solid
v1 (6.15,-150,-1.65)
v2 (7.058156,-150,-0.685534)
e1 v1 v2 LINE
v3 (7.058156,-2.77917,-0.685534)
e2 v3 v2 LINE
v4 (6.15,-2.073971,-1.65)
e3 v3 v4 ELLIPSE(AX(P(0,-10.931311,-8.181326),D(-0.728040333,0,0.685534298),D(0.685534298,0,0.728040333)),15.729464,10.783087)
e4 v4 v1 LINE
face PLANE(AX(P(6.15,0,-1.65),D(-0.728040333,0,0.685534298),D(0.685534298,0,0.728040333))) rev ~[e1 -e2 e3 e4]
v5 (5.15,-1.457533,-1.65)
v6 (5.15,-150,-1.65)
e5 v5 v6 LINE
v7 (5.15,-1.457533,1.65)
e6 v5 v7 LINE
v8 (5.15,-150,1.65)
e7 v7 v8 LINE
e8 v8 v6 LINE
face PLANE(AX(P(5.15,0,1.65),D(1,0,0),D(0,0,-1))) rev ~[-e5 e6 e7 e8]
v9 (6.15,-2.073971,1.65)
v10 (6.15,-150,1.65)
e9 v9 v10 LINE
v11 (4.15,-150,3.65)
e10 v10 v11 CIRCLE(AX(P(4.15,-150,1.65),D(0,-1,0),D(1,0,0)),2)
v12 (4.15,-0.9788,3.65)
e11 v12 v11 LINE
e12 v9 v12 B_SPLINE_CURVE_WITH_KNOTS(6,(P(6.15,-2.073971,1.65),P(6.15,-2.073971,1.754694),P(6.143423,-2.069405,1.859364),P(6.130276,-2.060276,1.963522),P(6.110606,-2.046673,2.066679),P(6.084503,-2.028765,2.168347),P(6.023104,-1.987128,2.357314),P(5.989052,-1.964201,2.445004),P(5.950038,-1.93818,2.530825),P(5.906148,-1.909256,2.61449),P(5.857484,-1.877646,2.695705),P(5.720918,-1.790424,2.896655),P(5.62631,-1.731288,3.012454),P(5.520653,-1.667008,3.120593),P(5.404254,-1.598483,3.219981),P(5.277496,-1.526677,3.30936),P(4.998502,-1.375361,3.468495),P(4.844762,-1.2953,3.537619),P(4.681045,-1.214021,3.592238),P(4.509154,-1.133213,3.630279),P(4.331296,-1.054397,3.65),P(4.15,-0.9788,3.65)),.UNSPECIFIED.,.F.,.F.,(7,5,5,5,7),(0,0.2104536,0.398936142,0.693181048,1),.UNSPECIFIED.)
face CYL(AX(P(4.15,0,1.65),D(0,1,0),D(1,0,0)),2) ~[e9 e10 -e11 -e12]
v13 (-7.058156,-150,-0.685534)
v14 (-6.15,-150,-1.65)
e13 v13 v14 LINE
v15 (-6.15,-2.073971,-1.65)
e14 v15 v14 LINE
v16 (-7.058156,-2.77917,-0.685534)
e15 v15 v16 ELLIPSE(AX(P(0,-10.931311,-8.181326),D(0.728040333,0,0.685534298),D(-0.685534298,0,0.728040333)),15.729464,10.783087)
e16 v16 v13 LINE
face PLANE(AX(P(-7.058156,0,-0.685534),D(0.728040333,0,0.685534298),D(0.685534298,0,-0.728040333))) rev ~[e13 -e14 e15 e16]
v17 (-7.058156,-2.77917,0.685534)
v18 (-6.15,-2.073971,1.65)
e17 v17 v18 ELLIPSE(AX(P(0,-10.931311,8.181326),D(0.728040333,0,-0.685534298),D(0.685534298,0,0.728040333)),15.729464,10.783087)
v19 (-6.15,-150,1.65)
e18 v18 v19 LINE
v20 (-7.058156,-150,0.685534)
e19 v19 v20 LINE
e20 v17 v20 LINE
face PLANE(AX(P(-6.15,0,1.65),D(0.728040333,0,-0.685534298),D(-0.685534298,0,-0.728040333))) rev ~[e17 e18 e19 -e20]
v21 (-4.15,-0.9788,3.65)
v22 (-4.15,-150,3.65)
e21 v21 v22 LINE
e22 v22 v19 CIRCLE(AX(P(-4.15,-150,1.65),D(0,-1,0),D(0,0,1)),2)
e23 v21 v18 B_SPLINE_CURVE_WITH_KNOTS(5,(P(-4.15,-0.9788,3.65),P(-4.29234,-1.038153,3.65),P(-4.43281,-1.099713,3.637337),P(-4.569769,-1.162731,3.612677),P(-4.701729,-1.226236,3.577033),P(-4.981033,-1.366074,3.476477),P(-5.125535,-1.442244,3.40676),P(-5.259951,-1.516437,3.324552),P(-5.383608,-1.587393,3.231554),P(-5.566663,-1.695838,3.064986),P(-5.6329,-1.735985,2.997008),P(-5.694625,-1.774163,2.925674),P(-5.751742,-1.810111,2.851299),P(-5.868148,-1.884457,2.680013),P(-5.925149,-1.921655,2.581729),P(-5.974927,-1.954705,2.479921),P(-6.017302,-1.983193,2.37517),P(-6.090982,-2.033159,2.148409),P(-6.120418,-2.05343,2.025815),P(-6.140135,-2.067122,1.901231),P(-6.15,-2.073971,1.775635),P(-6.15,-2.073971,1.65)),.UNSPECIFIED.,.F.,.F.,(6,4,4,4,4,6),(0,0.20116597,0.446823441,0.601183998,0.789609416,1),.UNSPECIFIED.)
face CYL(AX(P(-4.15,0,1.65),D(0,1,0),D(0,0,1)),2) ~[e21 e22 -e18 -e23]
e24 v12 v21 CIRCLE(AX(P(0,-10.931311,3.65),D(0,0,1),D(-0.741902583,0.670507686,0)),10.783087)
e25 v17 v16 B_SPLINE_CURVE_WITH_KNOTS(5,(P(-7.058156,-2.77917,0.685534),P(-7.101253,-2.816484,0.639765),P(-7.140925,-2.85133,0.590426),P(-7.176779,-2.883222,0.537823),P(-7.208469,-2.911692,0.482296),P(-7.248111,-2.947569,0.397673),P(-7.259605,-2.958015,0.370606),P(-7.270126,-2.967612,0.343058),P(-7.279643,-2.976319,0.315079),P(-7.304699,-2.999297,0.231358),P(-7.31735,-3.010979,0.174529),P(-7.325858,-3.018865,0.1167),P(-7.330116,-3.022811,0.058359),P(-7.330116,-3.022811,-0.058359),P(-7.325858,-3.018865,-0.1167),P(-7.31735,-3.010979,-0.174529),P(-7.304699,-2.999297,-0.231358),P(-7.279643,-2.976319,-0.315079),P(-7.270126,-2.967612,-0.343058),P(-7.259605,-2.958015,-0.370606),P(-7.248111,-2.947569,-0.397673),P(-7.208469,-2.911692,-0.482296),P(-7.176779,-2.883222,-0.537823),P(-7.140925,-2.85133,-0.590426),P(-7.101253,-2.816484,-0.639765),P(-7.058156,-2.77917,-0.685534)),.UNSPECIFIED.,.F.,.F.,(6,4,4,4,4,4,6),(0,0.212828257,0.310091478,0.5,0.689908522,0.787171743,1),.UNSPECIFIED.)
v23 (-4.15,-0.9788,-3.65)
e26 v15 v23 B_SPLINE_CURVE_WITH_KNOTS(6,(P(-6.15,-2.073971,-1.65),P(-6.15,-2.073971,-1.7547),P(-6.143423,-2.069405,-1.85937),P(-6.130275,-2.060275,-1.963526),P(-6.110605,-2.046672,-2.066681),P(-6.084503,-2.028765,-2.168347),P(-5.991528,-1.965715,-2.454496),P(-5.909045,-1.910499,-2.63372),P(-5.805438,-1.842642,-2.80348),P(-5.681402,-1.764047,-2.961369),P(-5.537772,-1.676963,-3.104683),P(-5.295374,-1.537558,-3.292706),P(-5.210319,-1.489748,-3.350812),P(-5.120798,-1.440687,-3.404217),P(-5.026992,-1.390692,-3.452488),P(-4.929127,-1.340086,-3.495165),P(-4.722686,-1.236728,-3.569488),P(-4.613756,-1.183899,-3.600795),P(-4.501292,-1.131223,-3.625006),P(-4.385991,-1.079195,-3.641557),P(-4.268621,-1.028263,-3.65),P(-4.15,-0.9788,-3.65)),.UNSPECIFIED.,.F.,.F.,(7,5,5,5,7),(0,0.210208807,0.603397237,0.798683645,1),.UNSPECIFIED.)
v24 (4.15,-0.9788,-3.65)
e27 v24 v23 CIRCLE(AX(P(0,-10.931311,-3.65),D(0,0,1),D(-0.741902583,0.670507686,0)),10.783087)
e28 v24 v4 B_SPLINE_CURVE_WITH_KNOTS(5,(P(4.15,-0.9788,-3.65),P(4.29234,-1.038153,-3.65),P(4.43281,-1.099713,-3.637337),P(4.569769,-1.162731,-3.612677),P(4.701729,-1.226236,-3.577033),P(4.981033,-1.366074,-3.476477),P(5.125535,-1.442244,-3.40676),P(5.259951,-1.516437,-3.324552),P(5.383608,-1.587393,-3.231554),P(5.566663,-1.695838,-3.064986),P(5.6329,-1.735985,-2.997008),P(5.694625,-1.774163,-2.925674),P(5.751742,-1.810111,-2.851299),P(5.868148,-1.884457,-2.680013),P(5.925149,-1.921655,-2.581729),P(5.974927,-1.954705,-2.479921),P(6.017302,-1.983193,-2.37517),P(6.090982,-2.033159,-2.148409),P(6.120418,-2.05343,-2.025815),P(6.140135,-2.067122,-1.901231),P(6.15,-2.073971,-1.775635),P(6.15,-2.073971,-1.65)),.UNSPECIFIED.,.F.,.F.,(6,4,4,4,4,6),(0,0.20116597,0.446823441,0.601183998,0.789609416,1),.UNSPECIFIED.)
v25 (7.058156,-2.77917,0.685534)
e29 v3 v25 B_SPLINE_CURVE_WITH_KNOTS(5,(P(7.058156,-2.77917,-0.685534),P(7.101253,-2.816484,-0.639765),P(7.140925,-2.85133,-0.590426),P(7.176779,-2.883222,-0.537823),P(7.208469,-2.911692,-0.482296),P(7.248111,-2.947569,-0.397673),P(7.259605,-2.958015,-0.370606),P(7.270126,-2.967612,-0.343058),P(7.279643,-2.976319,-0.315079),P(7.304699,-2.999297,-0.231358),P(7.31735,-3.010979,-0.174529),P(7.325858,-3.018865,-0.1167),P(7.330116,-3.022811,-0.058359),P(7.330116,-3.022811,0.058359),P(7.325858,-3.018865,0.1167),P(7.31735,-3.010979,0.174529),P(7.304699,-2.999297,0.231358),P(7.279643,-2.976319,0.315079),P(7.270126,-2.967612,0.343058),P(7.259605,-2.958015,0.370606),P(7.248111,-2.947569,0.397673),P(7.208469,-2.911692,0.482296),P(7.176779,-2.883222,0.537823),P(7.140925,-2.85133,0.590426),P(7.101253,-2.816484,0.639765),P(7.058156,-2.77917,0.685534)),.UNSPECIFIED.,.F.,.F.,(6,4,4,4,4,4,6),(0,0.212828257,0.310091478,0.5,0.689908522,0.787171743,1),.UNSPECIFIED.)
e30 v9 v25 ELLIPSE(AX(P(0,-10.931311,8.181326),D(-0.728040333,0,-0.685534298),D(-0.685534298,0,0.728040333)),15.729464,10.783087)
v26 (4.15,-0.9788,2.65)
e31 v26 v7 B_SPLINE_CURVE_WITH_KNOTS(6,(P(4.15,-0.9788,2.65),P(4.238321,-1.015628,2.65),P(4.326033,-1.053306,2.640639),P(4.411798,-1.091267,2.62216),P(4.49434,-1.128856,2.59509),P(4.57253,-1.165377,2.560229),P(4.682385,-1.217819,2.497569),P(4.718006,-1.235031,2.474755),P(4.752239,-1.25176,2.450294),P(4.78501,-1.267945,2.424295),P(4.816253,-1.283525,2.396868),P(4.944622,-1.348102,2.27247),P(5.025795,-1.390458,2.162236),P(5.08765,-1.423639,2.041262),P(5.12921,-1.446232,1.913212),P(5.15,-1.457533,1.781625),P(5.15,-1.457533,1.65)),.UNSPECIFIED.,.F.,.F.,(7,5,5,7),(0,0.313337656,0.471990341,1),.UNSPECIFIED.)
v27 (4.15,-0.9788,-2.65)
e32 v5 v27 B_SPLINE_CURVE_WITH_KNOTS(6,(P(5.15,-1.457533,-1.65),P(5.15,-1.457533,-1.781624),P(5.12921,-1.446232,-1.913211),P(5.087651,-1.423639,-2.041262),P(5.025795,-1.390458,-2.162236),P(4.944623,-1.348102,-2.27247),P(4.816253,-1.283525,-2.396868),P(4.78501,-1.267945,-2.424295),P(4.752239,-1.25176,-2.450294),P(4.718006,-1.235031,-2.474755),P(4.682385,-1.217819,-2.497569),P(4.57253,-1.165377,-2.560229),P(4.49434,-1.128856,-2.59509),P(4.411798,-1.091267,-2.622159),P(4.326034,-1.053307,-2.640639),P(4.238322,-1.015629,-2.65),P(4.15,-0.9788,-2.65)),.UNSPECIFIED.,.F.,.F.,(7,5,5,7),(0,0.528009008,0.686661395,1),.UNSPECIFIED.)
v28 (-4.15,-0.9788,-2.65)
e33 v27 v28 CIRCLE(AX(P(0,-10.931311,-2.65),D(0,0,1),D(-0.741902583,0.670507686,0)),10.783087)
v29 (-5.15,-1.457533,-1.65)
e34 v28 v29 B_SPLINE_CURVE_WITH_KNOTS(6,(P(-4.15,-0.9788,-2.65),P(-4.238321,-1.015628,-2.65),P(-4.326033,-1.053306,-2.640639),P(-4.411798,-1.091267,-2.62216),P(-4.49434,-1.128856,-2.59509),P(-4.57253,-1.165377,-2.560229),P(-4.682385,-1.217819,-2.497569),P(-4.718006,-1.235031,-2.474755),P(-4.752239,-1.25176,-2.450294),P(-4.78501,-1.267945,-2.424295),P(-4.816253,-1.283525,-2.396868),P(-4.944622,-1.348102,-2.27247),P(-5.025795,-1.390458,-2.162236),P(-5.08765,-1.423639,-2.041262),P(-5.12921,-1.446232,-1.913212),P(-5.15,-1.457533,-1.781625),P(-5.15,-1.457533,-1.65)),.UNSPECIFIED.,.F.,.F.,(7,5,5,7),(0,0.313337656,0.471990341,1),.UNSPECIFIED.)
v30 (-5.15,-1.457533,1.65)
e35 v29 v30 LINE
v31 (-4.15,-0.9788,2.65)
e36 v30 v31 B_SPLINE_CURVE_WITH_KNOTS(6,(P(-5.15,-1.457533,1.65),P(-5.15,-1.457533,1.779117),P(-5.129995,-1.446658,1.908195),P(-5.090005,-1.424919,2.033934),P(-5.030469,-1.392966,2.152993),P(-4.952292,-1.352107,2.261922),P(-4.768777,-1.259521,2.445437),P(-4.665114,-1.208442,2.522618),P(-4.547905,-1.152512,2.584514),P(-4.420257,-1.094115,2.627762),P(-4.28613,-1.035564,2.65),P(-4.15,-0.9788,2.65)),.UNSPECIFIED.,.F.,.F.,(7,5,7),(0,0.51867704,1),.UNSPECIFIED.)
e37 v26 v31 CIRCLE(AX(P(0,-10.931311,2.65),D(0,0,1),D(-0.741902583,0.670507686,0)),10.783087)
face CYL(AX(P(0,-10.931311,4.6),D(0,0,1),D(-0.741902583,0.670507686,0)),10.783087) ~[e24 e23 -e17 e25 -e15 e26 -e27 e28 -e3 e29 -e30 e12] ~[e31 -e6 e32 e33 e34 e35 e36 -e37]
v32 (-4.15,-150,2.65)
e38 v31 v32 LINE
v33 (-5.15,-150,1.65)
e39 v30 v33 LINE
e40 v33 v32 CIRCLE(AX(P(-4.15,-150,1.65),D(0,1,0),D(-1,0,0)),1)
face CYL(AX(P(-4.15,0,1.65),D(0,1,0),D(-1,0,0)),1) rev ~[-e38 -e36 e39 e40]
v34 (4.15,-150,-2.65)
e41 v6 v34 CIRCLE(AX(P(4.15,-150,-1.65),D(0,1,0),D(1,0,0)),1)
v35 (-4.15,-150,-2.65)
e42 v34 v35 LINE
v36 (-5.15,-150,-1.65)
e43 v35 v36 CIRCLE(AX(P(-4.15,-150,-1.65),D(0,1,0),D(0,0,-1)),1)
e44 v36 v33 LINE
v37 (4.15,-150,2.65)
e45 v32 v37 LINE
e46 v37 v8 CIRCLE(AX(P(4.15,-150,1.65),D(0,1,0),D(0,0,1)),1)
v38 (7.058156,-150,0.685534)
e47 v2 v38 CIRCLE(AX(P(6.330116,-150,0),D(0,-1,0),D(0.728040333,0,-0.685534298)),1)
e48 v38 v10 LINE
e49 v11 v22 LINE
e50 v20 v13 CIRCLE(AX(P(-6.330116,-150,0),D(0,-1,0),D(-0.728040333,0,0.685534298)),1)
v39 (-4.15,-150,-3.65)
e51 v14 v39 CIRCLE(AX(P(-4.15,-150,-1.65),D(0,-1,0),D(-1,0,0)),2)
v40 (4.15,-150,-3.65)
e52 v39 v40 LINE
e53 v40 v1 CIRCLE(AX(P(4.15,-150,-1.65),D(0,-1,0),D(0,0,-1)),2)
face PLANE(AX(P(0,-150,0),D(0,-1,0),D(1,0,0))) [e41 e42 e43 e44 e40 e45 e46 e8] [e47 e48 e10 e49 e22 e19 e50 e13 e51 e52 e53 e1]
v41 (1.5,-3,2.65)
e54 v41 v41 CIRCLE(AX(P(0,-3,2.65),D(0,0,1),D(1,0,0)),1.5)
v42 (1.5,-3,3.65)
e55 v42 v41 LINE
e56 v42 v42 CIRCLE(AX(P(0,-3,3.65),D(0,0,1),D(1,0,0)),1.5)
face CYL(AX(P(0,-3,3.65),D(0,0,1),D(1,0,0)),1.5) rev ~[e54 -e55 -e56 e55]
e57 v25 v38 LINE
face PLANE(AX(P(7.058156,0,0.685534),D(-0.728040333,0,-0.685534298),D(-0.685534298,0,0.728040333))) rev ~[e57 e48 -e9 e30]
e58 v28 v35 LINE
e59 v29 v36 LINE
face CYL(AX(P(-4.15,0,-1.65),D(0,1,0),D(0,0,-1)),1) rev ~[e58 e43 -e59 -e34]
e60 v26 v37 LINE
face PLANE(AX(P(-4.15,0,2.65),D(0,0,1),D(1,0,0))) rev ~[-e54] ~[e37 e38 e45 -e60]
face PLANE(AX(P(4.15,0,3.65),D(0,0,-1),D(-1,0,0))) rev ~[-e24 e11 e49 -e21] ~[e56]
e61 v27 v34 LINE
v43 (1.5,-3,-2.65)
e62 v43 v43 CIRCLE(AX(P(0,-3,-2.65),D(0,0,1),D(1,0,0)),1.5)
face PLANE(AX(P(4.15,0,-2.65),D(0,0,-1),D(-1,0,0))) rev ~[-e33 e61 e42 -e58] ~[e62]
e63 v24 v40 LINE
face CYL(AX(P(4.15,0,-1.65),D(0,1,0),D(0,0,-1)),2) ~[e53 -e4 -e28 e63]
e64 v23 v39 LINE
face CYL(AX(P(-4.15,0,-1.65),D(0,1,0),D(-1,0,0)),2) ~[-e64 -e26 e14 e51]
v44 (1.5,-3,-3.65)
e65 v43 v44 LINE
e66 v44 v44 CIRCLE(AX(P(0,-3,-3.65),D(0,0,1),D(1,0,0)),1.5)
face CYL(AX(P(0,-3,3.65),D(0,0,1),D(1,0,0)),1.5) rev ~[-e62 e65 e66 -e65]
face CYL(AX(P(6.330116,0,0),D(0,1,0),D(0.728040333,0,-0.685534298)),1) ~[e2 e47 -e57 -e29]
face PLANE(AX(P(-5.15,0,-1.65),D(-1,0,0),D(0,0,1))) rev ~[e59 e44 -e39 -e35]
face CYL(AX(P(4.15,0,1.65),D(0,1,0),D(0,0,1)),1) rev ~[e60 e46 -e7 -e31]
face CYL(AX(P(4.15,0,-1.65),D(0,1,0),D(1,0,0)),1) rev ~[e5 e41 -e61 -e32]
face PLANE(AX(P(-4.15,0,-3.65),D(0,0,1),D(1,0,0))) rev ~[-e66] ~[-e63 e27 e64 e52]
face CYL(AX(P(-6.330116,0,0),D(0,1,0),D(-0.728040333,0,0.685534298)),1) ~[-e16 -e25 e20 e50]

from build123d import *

# Parameters (mm, degrees)
F1_DEPTH = 150
F2_R     = 1.5
F3_DEPTH = 7.301
F6_DEPTH = 25


# Not quite as in the source:
# - a feature names something its author has since deleted; it is built from what else it names


with BuildPart() as f1:
    # F0 (on Front) → F1 (new body)
    with BuildSketch(Plane.XZ):
        with BuildLine():
            Line((7.0581561667, 0.685534298), (6.15, 1.65))
            ThreePointArc((6.15, 1.65), (5.5642135624, 3.0642135624), (4.15, 3.65))
            Line((4.15, 3.65), (-4.15, 3.65))
            ThreePointArc((-4.15, 3.65), (-5.5642135624, 3.0642135624), (-6.15, 1.65))
            Line((-6.15, 1.65), (-7.0581561667, 0.685534298))
            ThreePointArc((-7.0581561667, 0.685534298), (-7.3301158338, 0), (-7.0581561667, -0.685534298))
            Line((-7.0581561667, -0.685534298), (-6.15, -1.65))
            ThreePointArc((-6.15, -1.65), (-5.5642135624, -3.0642135624), (-4.15, -3.65))
            Line((-4.15, -3.65), (4.15, -3.65))
            ThreePointArc((4.15, -3.65), (5.5642135624, -3.0642135624), (6.15, -1.65))
            Line((6.15, -1.65), (7.0581561667, -0.685534298))
            ThreePointArc((7.0581561667, -0.685534298), (7.3301158338, 0), (7.0581561667, 0.685534298))
        make_face()
        with BuildLine():
            ThreePointArc((5.15, -1.65), (4.8571067812, -2.3571067812), (4.15, -2.65))
            Line((4.15, -2.65), (-4.15, -2.65))
            ThreePointArc((-4.15, -2.65), (-4.8571067812, -2.3571067812), (-5.15, -1.65))
            Line((-5.15, -1.65), (-5.15, 1.65))
            ThreePointArc((-5.15, 1.65), (-4.8571067812, 2.3571067812), (-4.15, 2.65))
            Line((-4.15, 2.65), (4.15, 2.65))
            ThreePointArc((4.15, 2.65), (4.8571067812, 2.3571067812), (5.15, 1.65))
            Line((5.15, 1.65), (5.15, -1.65))
        make_face(mode=Mode.SUBTRACT)
    extrude(amount=F1_DEPTH)

    # F2 (on face) → F3 (cut, through all)
    with BuildSketch(Plane.XY.offset(3.65)):
        with Locations((0, -3)):
            Circle(F2_R)
    extrude(amount=-F3_DEPTH, mode=Mode.SUBTRACT)

    # F5 (on offset) → F6 (cut)
    with BuildSketch(Plane.XY.offset(4.6)):
        with BuildLine():
            Line((8, -3.7011680724), (8, 3.7011680724))
            Line((8, 3.7011680724), (-8, 3.7011680724))
            Line((-8, 3.7011680724), (-8, -3.7011680724))
            ThreePointArc((-8, -3.7011680724), (0, -0.1482238292), (8, -3.7011680724))
        make_face()
    extrude(amount=-F6_DEPTH, mode=Mode.SUBTRACT)


solid = f1.part
